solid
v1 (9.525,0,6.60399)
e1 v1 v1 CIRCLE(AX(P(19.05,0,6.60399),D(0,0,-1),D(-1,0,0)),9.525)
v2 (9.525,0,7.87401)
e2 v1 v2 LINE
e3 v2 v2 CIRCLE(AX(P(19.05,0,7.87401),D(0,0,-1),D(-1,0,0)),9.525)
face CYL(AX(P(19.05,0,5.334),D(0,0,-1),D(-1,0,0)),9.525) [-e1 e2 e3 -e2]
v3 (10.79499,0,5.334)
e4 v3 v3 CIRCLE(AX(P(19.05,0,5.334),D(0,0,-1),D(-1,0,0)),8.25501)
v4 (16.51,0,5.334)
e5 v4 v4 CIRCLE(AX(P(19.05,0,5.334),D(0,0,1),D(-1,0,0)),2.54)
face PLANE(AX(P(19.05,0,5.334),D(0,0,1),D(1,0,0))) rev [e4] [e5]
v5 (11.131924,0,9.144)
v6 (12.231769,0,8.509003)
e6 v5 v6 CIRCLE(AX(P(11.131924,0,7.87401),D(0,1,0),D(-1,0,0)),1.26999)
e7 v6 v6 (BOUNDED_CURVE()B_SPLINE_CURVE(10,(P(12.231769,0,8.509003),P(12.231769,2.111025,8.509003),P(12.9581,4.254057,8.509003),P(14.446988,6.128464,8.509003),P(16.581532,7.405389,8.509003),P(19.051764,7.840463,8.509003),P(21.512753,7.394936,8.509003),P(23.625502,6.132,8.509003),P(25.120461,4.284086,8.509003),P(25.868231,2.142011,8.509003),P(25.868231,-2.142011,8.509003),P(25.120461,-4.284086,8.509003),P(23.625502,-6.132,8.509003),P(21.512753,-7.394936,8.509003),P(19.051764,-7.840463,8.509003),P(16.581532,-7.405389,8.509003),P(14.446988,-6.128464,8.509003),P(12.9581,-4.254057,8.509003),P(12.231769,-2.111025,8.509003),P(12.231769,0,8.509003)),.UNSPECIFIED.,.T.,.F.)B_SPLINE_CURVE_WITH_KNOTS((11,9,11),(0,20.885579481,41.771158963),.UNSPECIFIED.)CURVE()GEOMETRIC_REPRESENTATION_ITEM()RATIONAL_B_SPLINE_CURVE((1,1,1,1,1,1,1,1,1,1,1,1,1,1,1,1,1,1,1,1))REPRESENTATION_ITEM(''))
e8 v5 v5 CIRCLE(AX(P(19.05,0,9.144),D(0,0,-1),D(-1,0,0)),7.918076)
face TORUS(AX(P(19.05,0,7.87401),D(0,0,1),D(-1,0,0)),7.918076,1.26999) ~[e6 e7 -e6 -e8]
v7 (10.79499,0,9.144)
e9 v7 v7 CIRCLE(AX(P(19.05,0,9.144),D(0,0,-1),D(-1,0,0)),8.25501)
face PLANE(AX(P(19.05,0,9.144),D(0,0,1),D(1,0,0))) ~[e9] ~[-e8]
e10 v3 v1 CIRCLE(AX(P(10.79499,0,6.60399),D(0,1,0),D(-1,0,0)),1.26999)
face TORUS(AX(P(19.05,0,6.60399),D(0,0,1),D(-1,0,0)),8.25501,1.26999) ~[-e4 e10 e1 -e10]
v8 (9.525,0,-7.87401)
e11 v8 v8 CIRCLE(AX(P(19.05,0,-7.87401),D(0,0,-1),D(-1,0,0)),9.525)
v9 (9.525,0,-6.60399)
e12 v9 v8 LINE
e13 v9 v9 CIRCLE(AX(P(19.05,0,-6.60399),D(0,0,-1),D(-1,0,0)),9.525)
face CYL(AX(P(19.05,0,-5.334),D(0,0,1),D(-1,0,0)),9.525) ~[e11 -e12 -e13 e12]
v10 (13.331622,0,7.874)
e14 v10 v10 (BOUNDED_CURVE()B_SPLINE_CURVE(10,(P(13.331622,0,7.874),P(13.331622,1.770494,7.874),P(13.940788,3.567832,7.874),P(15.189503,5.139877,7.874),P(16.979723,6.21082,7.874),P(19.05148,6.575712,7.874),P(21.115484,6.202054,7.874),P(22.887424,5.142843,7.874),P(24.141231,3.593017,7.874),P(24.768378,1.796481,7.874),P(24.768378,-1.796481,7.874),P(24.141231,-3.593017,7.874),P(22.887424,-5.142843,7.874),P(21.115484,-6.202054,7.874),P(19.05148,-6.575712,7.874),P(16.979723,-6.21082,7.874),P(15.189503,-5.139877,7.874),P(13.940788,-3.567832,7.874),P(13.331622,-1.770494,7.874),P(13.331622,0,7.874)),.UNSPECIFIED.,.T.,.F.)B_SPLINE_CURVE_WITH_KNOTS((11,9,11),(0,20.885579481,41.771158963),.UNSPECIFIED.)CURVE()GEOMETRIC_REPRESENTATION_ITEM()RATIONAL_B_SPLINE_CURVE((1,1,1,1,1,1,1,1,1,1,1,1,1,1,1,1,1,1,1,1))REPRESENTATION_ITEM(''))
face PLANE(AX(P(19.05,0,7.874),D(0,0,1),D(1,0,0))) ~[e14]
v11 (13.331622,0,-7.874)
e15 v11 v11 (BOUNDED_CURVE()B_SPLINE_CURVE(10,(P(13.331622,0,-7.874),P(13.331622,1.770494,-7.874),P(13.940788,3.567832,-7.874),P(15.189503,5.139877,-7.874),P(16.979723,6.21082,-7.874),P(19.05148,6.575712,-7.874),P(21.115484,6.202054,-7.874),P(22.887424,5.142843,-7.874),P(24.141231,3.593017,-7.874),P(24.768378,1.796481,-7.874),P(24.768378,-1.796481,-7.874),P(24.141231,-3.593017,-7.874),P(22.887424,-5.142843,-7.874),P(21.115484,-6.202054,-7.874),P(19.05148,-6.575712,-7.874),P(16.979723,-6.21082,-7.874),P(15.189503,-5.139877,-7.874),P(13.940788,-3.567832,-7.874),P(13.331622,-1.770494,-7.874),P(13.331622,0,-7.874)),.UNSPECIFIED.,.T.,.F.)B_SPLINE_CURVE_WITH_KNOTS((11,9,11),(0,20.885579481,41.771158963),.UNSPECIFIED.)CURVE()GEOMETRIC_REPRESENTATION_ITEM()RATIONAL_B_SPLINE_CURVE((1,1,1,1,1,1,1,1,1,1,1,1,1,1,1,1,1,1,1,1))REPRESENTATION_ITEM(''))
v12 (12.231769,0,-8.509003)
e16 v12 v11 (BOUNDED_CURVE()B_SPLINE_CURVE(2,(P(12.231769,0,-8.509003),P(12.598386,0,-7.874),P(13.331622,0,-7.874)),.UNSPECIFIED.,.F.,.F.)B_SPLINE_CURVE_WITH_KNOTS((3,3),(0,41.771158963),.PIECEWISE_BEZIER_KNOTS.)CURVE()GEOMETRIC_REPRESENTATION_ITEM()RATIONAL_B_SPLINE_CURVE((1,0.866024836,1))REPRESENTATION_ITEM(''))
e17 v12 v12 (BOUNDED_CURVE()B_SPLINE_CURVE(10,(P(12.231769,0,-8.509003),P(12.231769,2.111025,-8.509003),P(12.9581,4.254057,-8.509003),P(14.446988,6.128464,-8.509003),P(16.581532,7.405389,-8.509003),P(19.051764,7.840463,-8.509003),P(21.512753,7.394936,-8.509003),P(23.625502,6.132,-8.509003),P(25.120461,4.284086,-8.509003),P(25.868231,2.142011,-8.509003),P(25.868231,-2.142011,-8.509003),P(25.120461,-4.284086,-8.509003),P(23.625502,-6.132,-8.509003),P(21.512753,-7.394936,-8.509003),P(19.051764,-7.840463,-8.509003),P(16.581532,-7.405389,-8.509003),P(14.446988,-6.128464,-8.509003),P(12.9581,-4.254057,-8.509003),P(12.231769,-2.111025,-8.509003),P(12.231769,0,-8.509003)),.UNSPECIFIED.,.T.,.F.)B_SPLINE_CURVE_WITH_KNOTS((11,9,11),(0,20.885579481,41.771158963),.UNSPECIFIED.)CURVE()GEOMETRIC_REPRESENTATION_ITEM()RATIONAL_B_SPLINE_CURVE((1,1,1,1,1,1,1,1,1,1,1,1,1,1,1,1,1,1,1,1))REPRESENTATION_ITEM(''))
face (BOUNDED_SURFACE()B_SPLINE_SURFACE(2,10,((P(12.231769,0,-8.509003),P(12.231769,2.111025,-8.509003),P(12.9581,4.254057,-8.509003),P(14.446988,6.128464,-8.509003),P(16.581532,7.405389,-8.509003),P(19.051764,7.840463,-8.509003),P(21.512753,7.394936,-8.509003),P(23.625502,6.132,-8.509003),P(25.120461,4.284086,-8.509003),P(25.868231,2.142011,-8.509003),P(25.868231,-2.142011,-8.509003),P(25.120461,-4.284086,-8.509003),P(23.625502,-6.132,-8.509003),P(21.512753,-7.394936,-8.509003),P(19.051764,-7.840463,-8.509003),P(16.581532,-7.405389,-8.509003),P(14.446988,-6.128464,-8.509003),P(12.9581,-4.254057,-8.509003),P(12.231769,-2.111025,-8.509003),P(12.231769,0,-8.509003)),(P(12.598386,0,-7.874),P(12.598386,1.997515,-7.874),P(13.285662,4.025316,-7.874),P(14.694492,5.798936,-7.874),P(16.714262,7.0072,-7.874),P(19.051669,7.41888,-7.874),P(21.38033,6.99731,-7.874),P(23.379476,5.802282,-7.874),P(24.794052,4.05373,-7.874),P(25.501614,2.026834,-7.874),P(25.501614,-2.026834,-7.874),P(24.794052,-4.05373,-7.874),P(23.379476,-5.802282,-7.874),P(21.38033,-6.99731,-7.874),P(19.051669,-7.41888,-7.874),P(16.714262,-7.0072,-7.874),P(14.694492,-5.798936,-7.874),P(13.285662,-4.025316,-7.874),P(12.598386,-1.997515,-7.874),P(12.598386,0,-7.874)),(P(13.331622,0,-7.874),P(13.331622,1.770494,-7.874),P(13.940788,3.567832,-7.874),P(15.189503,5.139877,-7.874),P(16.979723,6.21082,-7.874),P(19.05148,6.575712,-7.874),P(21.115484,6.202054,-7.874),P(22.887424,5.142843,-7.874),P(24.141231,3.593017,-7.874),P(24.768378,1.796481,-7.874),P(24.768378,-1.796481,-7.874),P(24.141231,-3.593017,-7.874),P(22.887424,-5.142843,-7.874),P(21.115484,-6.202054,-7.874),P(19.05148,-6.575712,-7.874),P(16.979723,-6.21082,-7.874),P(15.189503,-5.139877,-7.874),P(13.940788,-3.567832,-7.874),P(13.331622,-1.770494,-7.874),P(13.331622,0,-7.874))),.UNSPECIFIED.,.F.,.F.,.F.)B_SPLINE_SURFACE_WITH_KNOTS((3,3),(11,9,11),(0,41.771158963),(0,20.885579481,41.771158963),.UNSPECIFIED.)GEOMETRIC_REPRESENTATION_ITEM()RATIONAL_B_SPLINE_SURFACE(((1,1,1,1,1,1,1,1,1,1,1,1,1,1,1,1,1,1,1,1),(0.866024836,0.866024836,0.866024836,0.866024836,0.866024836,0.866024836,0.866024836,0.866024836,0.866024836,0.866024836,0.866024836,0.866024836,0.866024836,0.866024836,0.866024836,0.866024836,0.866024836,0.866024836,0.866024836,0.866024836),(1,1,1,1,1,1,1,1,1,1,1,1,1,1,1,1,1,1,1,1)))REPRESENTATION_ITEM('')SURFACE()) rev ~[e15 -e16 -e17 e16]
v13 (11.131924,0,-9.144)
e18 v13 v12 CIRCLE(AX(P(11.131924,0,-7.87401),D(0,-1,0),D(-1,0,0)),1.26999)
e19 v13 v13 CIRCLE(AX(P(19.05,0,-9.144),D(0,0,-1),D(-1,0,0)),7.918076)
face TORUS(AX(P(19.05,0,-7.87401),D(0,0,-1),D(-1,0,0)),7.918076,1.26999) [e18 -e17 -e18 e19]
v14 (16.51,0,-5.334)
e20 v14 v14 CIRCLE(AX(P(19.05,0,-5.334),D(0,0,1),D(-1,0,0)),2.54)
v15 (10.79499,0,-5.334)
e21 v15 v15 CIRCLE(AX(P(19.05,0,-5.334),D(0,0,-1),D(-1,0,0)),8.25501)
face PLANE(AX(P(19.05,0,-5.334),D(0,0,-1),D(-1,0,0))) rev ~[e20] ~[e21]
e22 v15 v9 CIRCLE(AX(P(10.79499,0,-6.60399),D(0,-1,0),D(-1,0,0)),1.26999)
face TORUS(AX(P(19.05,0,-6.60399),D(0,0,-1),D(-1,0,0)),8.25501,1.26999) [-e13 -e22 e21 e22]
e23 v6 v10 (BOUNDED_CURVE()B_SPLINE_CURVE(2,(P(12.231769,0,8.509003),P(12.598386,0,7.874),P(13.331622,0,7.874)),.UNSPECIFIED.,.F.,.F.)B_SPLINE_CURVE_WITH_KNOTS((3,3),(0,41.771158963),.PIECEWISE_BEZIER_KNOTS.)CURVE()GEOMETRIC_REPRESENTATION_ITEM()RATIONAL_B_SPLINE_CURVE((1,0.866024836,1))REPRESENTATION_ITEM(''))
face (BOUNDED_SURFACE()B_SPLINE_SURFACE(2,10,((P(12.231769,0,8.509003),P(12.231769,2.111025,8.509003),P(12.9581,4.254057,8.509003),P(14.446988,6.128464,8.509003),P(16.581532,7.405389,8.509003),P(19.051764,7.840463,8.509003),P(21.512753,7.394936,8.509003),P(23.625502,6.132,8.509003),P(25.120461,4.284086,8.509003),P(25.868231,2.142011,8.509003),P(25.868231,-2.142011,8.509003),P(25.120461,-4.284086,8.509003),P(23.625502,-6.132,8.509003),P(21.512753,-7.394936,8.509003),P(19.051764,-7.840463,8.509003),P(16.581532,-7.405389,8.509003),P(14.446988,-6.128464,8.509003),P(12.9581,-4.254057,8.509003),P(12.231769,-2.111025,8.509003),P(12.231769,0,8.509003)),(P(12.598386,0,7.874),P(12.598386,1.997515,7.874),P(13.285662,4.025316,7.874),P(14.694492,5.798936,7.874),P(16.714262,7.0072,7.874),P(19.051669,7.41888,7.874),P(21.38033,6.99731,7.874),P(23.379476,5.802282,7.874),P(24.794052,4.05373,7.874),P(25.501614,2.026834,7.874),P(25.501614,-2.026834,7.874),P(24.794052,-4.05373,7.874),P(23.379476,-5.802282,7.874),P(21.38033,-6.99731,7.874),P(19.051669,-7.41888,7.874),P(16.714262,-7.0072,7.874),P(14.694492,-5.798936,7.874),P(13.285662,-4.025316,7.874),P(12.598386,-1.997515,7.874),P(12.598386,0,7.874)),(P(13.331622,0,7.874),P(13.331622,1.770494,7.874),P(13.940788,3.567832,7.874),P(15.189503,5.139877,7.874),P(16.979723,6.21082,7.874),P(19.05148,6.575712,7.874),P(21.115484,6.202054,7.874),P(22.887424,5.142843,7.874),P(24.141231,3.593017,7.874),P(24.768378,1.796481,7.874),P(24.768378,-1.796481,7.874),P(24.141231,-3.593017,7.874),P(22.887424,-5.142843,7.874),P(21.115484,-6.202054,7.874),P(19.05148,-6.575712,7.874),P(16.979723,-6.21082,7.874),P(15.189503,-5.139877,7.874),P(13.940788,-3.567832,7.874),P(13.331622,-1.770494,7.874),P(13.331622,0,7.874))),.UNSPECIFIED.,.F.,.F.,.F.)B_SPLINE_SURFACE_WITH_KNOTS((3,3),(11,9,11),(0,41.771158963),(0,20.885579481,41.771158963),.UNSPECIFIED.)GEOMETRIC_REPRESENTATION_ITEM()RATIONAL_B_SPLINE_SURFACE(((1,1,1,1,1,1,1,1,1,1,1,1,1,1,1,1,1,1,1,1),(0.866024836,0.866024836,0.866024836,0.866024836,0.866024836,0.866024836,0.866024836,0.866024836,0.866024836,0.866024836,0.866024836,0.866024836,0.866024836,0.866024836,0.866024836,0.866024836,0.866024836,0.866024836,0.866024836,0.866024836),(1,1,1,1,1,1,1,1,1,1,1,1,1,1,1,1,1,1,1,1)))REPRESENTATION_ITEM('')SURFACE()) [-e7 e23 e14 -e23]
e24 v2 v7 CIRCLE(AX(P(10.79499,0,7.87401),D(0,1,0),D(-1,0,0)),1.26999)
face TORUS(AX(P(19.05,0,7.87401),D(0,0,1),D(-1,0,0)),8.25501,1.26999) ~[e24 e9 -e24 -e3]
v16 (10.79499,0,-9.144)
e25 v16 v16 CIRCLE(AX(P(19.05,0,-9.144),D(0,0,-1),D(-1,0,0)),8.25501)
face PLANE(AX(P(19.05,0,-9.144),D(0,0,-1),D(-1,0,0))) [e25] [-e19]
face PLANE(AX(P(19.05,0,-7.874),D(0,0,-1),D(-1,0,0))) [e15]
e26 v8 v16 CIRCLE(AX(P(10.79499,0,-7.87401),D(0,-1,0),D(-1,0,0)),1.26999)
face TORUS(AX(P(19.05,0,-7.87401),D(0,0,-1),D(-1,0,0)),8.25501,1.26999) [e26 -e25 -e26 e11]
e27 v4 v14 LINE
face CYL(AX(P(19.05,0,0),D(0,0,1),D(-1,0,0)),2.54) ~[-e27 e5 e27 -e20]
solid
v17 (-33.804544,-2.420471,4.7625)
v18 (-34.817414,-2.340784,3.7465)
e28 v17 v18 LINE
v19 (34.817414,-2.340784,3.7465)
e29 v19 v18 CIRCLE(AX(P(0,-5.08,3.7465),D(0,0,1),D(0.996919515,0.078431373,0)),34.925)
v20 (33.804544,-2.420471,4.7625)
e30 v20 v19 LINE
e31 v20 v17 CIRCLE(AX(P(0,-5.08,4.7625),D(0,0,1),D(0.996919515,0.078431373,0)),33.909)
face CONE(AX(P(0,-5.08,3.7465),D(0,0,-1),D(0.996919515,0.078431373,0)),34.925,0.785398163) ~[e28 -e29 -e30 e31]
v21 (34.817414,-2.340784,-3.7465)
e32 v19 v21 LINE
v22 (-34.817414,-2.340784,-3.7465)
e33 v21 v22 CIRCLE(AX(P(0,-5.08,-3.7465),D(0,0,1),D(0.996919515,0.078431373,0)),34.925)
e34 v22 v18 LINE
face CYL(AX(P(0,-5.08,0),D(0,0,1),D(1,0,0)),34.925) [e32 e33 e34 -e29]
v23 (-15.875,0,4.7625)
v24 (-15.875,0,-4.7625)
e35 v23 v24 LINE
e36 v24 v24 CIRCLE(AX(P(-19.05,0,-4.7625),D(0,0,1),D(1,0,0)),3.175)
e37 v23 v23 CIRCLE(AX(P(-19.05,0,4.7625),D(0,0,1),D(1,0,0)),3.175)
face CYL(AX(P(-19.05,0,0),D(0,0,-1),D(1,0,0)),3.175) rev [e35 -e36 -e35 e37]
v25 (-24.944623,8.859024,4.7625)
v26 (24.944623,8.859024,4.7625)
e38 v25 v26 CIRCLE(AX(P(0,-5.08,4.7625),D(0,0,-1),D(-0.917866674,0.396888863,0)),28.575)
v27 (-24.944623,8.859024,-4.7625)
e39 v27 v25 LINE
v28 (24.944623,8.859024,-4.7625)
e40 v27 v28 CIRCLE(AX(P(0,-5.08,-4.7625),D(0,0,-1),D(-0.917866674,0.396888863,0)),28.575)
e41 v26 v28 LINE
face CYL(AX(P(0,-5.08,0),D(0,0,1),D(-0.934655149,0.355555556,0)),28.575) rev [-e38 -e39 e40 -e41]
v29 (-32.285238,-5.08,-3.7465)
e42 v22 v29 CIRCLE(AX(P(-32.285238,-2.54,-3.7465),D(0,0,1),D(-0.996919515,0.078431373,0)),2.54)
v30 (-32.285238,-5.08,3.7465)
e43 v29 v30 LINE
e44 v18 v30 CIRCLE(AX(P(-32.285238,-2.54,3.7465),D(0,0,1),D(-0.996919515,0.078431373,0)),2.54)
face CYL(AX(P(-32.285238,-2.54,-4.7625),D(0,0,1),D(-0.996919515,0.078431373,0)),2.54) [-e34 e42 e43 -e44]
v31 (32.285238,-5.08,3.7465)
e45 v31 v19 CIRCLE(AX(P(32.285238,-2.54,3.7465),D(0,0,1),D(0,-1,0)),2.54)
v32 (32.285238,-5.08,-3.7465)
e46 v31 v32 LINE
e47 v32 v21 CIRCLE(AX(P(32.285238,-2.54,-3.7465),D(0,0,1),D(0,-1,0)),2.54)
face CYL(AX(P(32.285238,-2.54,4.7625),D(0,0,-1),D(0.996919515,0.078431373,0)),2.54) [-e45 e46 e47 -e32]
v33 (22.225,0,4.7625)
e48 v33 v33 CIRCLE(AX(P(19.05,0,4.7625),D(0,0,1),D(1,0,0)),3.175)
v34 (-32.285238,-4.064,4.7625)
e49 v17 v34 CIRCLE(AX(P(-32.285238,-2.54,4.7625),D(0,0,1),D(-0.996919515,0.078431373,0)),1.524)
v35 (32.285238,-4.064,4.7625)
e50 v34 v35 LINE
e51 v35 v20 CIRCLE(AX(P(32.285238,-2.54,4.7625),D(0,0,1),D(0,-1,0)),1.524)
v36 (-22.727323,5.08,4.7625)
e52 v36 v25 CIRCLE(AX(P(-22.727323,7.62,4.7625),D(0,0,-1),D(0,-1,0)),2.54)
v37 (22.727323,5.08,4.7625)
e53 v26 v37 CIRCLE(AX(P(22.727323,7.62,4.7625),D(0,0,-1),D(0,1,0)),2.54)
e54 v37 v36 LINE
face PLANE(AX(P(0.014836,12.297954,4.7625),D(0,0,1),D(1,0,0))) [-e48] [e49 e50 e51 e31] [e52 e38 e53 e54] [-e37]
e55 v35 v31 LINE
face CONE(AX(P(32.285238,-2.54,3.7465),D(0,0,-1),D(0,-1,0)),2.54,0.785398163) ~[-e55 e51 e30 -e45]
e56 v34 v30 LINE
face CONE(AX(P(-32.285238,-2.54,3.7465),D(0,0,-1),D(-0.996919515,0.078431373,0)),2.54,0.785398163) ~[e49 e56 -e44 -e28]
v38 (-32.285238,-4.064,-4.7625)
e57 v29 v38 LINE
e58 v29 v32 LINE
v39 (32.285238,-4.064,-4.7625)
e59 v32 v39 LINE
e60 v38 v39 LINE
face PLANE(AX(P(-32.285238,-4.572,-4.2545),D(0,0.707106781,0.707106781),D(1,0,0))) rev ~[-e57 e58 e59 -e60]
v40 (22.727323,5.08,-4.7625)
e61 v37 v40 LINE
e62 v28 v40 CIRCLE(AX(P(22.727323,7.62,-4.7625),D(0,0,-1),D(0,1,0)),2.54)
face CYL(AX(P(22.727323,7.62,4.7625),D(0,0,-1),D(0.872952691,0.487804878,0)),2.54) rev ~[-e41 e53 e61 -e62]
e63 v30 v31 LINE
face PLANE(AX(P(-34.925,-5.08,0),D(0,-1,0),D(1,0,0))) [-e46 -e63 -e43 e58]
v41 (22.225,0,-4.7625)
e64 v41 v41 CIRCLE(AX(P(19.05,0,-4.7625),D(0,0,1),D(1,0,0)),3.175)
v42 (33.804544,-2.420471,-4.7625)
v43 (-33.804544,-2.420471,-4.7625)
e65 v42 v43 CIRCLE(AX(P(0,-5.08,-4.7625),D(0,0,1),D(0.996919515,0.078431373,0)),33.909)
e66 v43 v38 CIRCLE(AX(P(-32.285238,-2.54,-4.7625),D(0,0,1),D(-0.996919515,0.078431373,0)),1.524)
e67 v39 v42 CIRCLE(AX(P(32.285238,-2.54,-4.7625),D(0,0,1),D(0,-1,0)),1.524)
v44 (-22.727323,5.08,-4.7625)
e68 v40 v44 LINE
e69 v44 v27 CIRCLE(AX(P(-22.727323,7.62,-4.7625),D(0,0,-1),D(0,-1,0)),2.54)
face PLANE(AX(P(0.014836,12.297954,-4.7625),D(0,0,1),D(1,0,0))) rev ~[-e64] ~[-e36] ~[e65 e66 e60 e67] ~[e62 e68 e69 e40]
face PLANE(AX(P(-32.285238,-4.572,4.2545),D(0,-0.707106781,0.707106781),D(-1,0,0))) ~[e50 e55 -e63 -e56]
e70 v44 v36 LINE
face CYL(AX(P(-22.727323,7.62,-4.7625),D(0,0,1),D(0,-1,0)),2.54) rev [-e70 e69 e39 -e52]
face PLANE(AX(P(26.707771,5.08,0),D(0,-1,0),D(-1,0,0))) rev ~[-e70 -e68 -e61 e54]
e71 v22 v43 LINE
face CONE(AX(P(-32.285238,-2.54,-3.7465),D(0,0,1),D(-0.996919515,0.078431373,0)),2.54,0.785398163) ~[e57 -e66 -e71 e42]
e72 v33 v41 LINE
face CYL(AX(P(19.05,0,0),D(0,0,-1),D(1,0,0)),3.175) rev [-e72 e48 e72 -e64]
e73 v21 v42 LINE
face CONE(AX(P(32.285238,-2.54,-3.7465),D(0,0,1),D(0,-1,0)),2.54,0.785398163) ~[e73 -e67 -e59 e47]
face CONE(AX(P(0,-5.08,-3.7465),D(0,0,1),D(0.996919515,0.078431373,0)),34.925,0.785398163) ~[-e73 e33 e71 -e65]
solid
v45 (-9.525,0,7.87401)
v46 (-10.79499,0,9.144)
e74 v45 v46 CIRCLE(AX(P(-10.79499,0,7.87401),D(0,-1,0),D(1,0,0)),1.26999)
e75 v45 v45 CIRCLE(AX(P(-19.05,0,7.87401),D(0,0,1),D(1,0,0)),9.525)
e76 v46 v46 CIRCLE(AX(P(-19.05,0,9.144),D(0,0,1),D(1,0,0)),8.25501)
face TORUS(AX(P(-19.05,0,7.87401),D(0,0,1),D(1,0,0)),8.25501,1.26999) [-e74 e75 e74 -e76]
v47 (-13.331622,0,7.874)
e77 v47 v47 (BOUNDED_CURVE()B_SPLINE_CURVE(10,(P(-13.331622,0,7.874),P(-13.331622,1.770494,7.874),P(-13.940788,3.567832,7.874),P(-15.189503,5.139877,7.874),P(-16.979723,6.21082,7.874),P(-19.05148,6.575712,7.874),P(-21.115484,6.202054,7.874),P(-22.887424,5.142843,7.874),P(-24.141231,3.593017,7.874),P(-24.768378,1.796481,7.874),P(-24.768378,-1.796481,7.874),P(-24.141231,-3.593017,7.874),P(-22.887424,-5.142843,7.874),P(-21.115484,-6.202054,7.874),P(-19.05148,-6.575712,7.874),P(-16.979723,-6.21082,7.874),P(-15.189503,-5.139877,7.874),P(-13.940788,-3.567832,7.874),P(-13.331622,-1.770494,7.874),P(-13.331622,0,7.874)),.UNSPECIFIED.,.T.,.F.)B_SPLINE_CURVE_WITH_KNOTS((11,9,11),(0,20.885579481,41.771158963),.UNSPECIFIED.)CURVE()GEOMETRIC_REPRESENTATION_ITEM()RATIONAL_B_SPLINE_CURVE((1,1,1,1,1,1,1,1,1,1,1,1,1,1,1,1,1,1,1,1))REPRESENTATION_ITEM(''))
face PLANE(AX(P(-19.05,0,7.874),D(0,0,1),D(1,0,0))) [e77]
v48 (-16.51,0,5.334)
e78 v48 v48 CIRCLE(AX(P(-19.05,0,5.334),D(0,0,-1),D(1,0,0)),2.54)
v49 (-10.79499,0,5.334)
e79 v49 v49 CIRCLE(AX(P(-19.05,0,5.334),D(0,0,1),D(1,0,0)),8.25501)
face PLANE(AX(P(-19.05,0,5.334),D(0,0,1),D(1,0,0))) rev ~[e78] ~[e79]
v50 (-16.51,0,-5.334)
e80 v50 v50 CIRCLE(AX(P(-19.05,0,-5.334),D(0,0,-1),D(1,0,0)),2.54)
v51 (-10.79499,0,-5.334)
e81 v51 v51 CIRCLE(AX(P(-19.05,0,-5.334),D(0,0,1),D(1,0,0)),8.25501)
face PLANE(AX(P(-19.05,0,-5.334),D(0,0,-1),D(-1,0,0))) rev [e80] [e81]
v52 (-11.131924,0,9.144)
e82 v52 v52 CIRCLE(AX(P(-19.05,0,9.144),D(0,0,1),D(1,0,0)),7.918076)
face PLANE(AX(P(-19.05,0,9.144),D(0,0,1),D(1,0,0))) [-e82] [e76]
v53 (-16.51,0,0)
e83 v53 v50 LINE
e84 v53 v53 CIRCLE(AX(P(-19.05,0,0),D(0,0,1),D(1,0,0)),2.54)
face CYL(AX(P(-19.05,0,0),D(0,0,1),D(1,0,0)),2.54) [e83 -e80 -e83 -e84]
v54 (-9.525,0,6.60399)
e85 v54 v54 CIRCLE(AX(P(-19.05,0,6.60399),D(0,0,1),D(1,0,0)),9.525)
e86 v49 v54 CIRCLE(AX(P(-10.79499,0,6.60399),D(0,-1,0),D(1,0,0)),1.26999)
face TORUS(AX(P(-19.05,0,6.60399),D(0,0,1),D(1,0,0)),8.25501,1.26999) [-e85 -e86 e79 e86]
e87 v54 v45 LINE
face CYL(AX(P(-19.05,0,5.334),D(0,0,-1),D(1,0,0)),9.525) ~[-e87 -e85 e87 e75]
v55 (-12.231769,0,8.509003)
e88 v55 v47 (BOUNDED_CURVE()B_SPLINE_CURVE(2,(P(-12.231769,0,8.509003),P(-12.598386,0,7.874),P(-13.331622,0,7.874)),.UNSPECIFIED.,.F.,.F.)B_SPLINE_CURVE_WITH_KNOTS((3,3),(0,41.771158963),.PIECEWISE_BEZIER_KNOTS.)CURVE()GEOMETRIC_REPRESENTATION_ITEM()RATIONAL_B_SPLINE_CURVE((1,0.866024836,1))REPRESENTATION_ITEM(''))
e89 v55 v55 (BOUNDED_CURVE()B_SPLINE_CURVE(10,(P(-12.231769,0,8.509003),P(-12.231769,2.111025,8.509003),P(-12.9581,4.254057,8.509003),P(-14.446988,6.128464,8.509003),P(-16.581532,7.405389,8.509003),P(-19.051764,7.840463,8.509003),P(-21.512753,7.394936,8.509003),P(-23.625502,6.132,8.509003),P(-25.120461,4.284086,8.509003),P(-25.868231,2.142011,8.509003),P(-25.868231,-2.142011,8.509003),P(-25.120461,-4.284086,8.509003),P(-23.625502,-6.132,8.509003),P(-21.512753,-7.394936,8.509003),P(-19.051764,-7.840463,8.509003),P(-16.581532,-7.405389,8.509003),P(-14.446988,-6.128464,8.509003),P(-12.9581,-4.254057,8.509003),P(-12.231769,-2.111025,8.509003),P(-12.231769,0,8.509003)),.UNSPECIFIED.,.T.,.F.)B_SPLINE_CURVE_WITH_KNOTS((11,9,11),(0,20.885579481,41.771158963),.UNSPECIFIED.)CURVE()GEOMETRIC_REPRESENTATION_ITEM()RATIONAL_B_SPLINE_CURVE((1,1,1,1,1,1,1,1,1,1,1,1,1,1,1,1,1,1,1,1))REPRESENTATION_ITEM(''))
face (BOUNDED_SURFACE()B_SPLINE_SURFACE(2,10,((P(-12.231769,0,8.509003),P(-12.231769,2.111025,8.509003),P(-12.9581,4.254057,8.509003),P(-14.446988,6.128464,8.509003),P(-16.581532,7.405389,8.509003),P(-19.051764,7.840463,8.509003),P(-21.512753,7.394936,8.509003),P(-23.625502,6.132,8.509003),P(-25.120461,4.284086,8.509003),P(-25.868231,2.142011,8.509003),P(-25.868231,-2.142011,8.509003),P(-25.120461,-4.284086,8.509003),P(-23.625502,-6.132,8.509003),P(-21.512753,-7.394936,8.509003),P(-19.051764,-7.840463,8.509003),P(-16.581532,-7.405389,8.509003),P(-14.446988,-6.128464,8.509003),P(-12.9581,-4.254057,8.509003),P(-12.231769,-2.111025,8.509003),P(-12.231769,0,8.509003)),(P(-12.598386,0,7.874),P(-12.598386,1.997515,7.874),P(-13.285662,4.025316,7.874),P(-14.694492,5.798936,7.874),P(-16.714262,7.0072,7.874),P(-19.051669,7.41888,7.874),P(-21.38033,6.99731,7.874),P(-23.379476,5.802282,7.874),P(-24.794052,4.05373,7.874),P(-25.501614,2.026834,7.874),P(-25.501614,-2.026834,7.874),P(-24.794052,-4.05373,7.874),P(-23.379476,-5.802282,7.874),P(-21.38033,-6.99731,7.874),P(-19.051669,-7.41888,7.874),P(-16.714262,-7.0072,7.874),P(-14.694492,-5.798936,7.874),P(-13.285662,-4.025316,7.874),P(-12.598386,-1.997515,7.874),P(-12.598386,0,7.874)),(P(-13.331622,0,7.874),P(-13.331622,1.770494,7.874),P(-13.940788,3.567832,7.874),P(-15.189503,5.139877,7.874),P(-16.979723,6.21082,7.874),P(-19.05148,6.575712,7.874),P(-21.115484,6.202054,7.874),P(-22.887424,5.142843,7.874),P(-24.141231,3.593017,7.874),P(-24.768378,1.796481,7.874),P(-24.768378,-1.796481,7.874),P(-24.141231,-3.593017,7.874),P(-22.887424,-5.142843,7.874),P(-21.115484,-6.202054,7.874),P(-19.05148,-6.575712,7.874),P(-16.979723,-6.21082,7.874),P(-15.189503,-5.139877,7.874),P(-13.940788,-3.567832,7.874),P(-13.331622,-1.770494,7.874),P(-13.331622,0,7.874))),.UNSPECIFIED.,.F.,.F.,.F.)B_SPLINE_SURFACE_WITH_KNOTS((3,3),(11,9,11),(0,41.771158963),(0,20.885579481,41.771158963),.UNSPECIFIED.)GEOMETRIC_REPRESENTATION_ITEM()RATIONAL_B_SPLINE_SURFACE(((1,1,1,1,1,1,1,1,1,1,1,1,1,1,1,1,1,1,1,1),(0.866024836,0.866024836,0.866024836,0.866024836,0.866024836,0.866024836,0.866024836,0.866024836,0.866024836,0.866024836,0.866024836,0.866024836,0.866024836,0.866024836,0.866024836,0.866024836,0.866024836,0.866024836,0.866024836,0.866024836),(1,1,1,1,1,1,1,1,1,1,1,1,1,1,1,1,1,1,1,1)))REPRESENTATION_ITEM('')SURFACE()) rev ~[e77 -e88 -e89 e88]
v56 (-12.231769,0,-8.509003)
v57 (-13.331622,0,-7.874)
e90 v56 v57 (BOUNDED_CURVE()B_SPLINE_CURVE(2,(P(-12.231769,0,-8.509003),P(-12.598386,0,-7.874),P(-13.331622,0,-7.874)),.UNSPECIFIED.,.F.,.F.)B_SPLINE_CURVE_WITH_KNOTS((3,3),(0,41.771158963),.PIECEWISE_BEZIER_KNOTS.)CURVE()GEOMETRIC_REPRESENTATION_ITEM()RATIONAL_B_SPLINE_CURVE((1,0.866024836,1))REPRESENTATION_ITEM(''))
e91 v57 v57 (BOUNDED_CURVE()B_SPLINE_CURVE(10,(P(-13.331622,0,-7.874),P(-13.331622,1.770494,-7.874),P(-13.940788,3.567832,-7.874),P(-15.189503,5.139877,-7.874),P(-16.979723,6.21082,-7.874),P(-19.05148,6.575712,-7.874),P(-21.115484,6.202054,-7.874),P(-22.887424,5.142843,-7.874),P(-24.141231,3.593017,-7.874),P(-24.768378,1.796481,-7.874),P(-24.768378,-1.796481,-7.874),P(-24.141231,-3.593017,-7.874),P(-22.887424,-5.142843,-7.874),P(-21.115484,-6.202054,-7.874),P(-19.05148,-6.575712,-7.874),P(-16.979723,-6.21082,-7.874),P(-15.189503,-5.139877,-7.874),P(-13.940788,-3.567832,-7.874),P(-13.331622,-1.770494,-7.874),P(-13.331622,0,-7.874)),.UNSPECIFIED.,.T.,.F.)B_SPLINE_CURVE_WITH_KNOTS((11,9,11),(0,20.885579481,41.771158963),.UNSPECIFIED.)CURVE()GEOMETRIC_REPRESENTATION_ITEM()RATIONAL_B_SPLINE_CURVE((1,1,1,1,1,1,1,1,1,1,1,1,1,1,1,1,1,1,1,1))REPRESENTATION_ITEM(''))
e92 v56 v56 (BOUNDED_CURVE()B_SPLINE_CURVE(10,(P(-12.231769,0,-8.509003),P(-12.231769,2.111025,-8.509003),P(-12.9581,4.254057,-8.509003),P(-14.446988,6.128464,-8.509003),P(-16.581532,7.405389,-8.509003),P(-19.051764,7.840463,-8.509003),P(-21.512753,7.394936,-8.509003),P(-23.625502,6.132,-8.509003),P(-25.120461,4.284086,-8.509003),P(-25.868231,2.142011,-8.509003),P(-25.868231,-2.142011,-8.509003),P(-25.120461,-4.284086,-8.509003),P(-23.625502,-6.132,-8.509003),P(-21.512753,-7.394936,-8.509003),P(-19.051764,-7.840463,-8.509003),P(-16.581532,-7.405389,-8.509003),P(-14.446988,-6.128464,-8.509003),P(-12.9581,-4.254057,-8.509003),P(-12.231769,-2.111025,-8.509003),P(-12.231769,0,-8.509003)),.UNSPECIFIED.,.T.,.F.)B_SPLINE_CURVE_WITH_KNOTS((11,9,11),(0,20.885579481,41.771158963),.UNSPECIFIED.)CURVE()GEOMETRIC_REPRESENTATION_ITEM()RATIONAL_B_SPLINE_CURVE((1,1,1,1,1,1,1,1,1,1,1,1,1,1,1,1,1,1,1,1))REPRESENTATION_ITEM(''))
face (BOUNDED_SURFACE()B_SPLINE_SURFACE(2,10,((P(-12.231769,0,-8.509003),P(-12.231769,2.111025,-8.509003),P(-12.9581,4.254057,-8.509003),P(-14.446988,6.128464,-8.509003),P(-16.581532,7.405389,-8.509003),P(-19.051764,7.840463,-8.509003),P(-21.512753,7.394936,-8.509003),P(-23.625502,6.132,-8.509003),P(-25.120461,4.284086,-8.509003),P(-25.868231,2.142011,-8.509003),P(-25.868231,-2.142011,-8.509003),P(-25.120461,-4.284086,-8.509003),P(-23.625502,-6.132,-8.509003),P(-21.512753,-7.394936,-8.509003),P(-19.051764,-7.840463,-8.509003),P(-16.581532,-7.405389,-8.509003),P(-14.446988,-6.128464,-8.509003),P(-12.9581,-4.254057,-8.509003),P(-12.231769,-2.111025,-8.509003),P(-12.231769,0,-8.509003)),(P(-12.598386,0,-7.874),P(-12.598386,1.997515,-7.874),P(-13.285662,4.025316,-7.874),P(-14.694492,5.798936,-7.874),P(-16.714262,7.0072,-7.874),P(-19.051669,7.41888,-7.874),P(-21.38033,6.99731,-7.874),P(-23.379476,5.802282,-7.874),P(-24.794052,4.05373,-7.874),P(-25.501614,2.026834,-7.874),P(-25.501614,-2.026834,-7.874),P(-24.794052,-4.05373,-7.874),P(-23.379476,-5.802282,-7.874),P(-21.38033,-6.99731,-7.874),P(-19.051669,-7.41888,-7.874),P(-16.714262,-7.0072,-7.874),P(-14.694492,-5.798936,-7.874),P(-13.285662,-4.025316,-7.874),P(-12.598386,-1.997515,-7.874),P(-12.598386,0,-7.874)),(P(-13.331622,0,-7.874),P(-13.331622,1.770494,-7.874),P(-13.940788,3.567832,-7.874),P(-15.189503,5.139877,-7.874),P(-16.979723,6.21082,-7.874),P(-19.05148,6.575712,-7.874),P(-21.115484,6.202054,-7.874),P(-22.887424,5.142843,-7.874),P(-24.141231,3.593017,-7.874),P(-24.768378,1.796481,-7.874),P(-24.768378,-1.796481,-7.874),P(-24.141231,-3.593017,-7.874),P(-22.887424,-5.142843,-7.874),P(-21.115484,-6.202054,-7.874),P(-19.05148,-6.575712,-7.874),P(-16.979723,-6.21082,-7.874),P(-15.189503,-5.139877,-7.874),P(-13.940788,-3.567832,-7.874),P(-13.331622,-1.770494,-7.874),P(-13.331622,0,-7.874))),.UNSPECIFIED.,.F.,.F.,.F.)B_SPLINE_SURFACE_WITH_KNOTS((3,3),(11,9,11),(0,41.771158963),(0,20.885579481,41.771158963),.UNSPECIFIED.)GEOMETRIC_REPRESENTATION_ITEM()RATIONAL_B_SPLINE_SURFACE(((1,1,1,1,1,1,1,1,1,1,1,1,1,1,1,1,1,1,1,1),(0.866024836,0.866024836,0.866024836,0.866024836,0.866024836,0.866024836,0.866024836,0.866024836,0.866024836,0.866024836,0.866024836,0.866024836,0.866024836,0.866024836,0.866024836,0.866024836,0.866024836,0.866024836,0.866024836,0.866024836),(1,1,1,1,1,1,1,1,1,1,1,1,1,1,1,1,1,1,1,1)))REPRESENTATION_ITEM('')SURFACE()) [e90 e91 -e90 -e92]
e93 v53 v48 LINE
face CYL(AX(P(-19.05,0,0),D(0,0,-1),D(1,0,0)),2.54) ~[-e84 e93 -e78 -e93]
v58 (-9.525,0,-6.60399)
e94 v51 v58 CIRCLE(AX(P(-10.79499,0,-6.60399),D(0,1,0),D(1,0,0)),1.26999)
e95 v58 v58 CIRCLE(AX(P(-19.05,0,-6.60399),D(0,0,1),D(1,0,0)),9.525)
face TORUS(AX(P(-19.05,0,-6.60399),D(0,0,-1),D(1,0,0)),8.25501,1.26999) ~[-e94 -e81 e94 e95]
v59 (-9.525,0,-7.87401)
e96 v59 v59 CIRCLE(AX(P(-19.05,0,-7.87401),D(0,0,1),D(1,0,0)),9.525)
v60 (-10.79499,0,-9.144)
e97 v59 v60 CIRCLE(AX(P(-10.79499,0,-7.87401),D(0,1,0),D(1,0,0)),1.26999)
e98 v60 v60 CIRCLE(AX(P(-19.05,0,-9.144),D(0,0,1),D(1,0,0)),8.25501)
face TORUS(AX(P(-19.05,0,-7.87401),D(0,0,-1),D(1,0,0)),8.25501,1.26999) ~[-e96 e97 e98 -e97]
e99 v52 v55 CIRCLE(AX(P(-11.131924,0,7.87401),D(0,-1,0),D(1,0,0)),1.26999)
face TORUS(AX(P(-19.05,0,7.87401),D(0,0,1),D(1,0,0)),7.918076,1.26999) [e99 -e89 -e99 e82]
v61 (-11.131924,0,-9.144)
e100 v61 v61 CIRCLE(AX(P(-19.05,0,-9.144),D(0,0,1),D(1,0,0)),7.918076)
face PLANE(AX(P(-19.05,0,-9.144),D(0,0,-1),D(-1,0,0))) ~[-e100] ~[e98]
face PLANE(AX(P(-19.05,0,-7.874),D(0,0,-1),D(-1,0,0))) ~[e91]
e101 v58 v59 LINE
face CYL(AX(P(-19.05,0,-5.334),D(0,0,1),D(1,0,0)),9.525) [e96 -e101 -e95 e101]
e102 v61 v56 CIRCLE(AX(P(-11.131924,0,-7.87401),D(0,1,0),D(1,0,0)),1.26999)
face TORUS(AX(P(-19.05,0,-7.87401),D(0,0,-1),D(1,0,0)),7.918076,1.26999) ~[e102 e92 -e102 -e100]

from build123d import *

# Parameters (mm, degrees)
F0_R     = 3.175
F1_DEPTH = 4.7625
F2_R     = 2.54
F4_R     = 9.525
F5_DEPTH = 3.81
F6_R     = 2.54
F7_DEPTH = 9.144
F8_R     = 6.6480864276
F9_DEPTH = 1.27
F10_R    = 1.26999
F11_R    = 1.27
F14_R    = 2.54
F15_SIZE = 1.016


# Not quite as in the source:
# - a fillet or chamfer is up to 0.001 mm smaller than in the source, because OpenCascade refuses the exact size


with BuildPart() as f1:
    # F0 (on Top) → F1 (new body, symmetric)
    with BuildSketch(Plane.XY):
        with BuildLine():
            ThreePointArc((-27.1072467382, -5.08), (-28.5465059417, 0.7362064244), (-26.2280401979, 6.2610992579))
            ThreePointArc((-26.2280401979, 6.2610992579), (0, 23.495), (26.2280401979, 6.2610992579))
            ThreePointArc((26.2280401979, 6.2610992579), (27.9689813848, 3.3432612906), (28.575, 0))
            ThreePointArc((28.575, 0), (28.2007076279, -2.6438938915), (27.1072467382, -5.08))
            Line((27.1072467382, -5.08), (34.925, -5.08))
            ThreePointArc((34.925, -5.08), (0, 29.845), (-34.925, -5.08))
            Line((-34.925, -5.08), (-27.1072467382, -5.08))
        make_face()
        with BuildLine():
            ThreePointArc((-10.9927532618, -5.08), (-9.8992923721, -2.6438938915), (-9.525, 0))
            ThreePointArc((-9.525, 0), (-9.8992923721, 2.6438938915), (-10.9927532618, 5.08))
            Line((-10.9927532618, 5.08), (-26.7077708729, 5.08))
            ThreePointArc((-26.7077708729, 5.08), (-26.4744928619, 5.6732252234), (-26.2280401979, 6.2610992579))
            ThreePointArc((-26.2280401979, 6.2610992579), (-28.5465059417, 0.7362064244), (-27.1072467382, -5.08))
            Line((-27.1072467382, -5.08), (-10.9927532618, -5.08))
        make_face()
        with Locations((-19.05, 0)):
            Circle(F0_R, mode=Mode.SUBTRACT)
        with BuildLine():
            ThreePointArc((-10.9927532618, 5.08), (-9.8992923721, 2.6438938915), (-9.525, 0))
            ThreePointArc((-9.525, 0), (-9.8992923721, -2.6438938915), (-10.9927532618, -5.08))
            Line((-10.9927532618, -5.08), (10.9927532618, -5.08))
            ThreePointArc((10.9927532618, -5.08), (9.525, 0), (10.9927532618, 5.08))
            Line((10.9927532618, 5.08), (-10.9927532618, 5.08))
        make_face()
        with BuildLine():
            Line((26.7077708729, 5.08), (10.9927532618, 5.08))
            ThreePointArc((10.9927532618, 5.08), (9.525, 0), (10.9927532618, -5.08))
            Line((10.9927532618, -5.08), (27.1072467382, -5.08))
            ThreePointArc((27.1072467382, -5.08), (28.2007076279, -2.6438938915), (28.575, 0))
            ThreePointArc((28.575, 0), (27.9689813848, 3.3432612906), (26.2280401979, 6.2610992579))
            ThreePointArc((26.2280401979, 6.2610992579), (26.4744928619, 5.6732252234), (26.7077708729, 5.08))
        make_face()
        with Locations((19.05, 0)):
            Circle(F0_R, mode=Mode.SUBTRACT)
    extrude(amount=F1_DEPTH, both=True)

    # F2
    f2_edges = [f1.edges().sort_by_distance(p)[0] for p in [
        (-26.707771, 5.08, 0),
    ]]
    fillet(f2_edges, radius=F2_R)

    # F14
    f14_edges = [f1.edges().sort_by_distance(p)[0] for p in [
        (-34.925, -5.08, 0),
        (26.707771, 5.08, 0),
        (34.925, -5.08, 0),
    ]]
    fillet(f14_edges, radius=F14_R)

    # F15
    f15_edges = [f1.edges().sort_by_distance(p)[0] for p in [
        (0, 29.845, 4.7625),
        (0, 29.845, -4.7625),
        (34.150394, -4.26418, 4.7625),
        (-34.150394, -4.26418, 4.7625),
        (0, -5.08, 4.7625),
        (34.150394, -4.26418, -4.7625),
        (-34.150394, -4.26418, -4.7625),
        (0, -5.08, -4.7625),
    ]]
    chamfer(f15_edges, length=F15_SIZE)


with BuildPart() as f5:
    # F4 (on offset) → F5 (new body)
    with BuildSketch(Plane.XY.offset(5.334)):
        with Locations((-19.05, 0)):
            Circle(F4_R)
    extrude(amount=F5_DEPTH)

    # F6 (on Top) → F7 (join, through all)
    with BuildSketch(Plane.XY):
        with Locations((-19.05, 0)):
            Circle(F6_R)
    extrude(amount=F7_DEPTH)

    # F8 (on face) → F9 (cut)
    with BuildSketch(Plane.XY.offset(9.144)):
        with Locations((-19.05, 0)):
            Circle(F8_R)
    extrude(amount=-F9_DEPTH, mode=Mode.SUBTRACT)

    # F10 (radius 1.27 in the source; OpenCascade refuses exactly that, so slightly less here)
    f10_edges = [f5.edges().sort_by_distance(p)[0] for p in [
        (-28.575, 0, 9.144),
        (-25.698086, 0, 9.144),
        (-28.575, 0, 5.334),
    ]]
    fillet(f10_edges, radius=F10_R)

    # F11
    f11_edges = [f5.edges().sort_by_distance(p)[0] for p in [
        (-25.698086, 0, 7.874),
    ]]
    fillet(f11_edges, radius=F11_R)

    # F12: F5 across plane


with BuildPart() as f5_1:
    add(f5.part)
    add(f5.part.mirror(Plane.XY))


with BuildPart() as f13_1:
    # F13: instance of F5
    add(f5_1.part.mirror(Plane.YZ))


solid = Compound([f1.part, f5_1.part, f13_1.part])
